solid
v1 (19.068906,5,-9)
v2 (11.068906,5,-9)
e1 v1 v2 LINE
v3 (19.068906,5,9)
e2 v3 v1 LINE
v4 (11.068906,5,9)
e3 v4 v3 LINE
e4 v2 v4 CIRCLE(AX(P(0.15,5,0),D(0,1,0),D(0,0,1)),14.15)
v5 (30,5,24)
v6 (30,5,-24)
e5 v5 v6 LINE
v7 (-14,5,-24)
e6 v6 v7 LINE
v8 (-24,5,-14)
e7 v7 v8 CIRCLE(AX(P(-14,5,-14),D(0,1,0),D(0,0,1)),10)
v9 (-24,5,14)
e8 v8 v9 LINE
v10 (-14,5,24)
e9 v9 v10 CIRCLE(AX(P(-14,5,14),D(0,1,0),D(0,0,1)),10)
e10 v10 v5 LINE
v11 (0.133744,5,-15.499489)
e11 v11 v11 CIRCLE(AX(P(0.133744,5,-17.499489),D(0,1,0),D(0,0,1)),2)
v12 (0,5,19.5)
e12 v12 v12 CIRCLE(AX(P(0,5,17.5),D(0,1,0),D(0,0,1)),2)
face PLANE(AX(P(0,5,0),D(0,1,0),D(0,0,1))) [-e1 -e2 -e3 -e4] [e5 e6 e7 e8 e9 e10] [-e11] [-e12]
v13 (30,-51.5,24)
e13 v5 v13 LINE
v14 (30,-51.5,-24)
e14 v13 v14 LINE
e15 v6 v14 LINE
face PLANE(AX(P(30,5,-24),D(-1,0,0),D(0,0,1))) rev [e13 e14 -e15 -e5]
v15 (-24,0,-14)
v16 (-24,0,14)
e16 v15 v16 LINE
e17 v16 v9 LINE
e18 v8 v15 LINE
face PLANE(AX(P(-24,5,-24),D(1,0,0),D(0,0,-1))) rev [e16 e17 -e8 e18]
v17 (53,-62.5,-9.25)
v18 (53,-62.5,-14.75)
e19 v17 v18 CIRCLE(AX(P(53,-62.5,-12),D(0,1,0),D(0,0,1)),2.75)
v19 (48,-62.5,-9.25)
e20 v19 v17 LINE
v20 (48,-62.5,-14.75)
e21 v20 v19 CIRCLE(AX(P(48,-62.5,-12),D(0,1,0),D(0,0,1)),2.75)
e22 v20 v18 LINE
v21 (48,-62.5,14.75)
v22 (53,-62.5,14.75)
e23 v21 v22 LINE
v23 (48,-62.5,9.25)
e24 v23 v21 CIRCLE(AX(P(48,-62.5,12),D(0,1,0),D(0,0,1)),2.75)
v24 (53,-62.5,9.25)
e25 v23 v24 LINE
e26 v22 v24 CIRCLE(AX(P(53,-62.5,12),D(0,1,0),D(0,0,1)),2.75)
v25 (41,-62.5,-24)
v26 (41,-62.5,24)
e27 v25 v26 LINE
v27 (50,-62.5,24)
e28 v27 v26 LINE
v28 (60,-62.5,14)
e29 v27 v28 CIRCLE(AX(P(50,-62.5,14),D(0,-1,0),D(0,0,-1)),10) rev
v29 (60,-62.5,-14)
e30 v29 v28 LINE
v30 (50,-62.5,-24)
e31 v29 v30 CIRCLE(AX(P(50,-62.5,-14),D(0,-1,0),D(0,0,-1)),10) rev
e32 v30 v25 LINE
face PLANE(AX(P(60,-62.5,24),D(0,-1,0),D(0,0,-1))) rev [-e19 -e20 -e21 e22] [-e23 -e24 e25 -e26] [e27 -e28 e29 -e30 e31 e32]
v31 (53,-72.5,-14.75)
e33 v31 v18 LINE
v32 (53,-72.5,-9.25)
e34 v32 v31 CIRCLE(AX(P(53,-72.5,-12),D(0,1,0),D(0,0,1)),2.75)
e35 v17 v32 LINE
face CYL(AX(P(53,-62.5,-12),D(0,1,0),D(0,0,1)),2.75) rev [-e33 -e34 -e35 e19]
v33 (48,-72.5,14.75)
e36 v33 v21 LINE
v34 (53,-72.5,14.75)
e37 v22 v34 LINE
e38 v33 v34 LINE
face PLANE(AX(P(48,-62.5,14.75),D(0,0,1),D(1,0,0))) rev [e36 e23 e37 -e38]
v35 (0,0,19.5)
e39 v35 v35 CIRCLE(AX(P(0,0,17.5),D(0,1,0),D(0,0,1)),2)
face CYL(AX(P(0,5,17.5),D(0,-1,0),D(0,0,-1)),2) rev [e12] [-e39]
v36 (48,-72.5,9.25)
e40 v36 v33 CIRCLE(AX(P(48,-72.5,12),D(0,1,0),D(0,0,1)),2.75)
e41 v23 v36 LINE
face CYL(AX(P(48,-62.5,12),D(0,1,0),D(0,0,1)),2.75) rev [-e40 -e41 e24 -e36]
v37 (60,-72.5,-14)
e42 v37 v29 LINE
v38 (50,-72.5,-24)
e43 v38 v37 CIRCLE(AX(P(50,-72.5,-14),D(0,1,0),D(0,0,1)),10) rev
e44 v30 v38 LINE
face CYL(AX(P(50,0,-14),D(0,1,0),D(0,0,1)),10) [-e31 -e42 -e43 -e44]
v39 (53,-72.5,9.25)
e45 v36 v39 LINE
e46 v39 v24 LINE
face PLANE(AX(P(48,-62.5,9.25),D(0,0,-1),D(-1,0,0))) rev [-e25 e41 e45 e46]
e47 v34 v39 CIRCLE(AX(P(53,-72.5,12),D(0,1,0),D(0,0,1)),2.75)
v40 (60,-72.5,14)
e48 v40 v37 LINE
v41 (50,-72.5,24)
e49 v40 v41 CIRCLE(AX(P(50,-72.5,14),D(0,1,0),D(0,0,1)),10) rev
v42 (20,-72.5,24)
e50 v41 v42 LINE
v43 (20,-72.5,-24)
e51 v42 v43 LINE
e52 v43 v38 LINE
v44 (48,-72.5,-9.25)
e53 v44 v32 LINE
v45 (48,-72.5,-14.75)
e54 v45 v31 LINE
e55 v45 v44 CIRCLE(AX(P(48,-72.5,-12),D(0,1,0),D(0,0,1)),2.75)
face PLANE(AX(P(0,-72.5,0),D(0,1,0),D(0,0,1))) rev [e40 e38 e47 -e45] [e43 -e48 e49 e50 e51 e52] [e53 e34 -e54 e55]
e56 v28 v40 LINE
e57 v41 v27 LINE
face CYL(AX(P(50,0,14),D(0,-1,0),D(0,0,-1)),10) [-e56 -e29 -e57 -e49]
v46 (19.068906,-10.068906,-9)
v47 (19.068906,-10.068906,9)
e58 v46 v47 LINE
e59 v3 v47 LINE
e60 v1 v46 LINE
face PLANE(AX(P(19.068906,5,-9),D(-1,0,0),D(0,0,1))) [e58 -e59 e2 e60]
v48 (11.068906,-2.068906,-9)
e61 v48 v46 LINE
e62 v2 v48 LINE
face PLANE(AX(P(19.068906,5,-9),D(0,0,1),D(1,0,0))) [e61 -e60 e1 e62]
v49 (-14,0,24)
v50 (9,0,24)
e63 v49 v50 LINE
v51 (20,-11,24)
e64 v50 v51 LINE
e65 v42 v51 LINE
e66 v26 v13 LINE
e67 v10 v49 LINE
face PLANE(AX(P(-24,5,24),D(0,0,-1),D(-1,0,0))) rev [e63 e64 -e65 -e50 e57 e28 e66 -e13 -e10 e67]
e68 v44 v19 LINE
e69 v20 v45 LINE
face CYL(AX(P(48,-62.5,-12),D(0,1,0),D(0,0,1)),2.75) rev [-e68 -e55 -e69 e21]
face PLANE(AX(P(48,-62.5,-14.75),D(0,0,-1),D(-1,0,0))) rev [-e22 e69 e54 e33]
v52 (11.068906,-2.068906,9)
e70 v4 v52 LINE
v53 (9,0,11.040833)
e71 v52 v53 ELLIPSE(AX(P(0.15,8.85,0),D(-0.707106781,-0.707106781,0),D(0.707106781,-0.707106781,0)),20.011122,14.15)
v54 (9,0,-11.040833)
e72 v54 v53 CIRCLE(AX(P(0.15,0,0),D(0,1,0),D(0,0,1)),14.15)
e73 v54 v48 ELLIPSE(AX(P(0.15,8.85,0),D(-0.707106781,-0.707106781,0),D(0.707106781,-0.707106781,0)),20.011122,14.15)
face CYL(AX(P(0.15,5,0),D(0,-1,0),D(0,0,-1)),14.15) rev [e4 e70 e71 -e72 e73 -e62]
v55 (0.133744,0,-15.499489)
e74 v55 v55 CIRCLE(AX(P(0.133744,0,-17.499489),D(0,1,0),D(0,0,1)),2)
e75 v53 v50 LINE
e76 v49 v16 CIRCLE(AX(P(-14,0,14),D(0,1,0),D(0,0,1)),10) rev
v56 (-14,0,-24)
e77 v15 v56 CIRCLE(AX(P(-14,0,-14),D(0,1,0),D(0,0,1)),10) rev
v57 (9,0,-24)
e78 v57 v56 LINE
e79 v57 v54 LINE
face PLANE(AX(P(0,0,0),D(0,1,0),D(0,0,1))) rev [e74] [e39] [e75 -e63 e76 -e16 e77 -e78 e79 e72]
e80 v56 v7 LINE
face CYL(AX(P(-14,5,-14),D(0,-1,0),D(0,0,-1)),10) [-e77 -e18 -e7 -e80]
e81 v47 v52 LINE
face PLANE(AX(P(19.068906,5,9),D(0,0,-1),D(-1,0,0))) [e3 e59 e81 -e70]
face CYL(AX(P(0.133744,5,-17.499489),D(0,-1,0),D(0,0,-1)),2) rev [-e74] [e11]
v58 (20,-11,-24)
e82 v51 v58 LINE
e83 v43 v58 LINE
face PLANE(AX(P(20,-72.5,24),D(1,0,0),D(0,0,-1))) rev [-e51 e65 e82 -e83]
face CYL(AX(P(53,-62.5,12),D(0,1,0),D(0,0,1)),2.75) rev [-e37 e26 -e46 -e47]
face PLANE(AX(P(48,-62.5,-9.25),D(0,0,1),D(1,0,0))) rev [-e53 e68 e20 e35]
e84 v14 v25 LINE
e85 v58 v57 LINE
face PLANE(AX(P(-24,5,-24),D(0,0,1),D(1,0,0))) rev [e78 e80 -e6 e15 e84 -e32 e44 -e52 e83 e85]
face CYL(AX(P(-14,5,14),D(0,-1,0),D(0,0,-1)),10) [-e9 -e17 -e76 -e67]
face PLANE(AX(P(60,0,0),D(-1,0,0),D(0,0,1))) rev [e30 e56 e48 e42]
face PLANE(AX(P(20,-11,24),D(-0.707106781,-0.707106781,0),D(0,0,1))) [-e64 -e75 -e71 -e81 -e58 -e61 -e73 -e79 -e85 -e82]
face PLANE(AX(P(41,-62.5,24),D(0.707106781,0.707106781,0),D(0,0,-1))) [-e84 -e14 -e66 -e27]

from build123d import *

# Parameters (mm, degrees)
SKETCH1_W                 = 54
SKETCH1_H                 = 48
SKETCH1_R                 = 2
BOSS_EXTRUDE1_DEPTH       = 5
SKETCH2_W                 = 10
SKETCH2_H                 = 48
BOSS_EXTRUDE2_DEPTH       = 72.5
SKETCH3_W                 = 48
SKETCH3_H                 = 10
BOSS_EXTRUDE3_DEPTH       = 30
FILLET1_R                 = 10
CHAMFER1_SIZE             = 11
F_1_0MM_START             = -72.5
F_1_0MM_DOWEL_SLOT1_DEPTH = 10
FILLET2_R                 = 10


# Read off the part's stored shape, not the designer's step: Ø1.0mm Dowel Slot1
with BuildPart() as part:
    # Sketch1 → Boss-Extrude1 (new body)
    with BuildSketch(Plane(origin=(0, 0, 0), x_dir=(1, 0, 0), z_dir=(0, 1, 0))):
        with Locations((3, 0)):
            Rectangle(SKETCH1_W, SKETCH1_H)
        with Locations(Location((0.133743503, 17.499488926, 0), (0, 0, 270))):
            Circle(SKETCH1_R, mode=Mode.SUBTRACT)
        with Locations(Location((0, -17.5, 0), (0, 0, 270))):
            Circle(SKETCH1_R, mode=Mode.SUBTRACT)
        with BuildLine():
            Line((19.068905623, 9), (11.068905623, 9))
            ThreePointArc((11.068905623, 9), (-14, 0), (11.068905623, -9))
            Line((11.068905623, -9), (19.068905623, -9))
            Line((19.068905623, -9), (19.068905623, 9))
        make_face(mode=Mode.SUBTRACT)
    extrude(amount=BOSS_EXTRUDE1_DEPTH)

    # Sketch2 → Boss-Extrude2 (add)
    with BuildSketch(Plane.XZ):
        with Locations((25, 0)):
            Rectangle(SKETCH2_W, SKETCH2_H)
    extrude(amount=BOSS_EXTRUDE2_DEPTH)

    # Sketch3 → Boss-Extrude3 (add)
    with BuildSketch(Plane(origin=(30, 0, 0), x_dir=(0, 0, -1), z_dir=(1, 0, 0))):
        with Locations((0, -67.5)):
            Rectangle(SKETCH3_W, SKETCH3_H)
    extrude(amount=BOSS_EXTRUDE3_DEPTH)

    # Fillet1
    fillet1_edges = [part.edges().sort_by_distance(p)[0] for p in [
        (-24, 2.5, -24),
        (-24, 2.5, 24),
    ]]
    fillet(fillet1_edges, radius=FILLET1_R)

    # Chamfer1
    # the kernel refuses this chamfer: 11 mm, written as the material it adds along each edge
    with BuildSketch(Plane(origin=(20, 0, 24), x_dir=(-0.9996219169112968, 0.027495876610586372, 0), z_dir=(0, 0, -1))) as chamfer1_piece_1_section:
        Polygon((CHAMFER1_SIZE * 0.999621916911, -CHAMFER1_SIZE * 0.0274958766106), (-CHAMFER1_SIZE * 0.0274958766106, -CHAMFER1_SIZE * 0.999621916911), (0, 0), align=None)
    chamfer1_piece_1 = extrude(amount=48, mode=Mode.PRIVATE)
    chamfer1_piece_1 = split(chamfer1_piece_1, bisect_by=Plane(origin=(15.585058089, -3.181005548, 9), z_dir=(0, 0, 1)), keep=Keep.TOP, mode=Mode.PRIVATE)
    chamfer1_piece_1 = chamfer1_piece_1 - Plane(origin=(0.15, -3.181005548, 0), x_dir=(0.7716541076196256, 0, -0.6360424028268551), z_dir=(0, -1, 0)) * Cylinder(14.15, 140, mode=Mode.PRIVATE)
    chamfer1_piece_1 = split(chamfer1_piece_1, bisect_by=Plane(origin=(19.068905623, -3.181005548, 16.524598141), z_dir=(-1, 0, 0)), keep=Keep.TOP, mode=Mode.PRIVATE)
    add(chamfer1_piece_1)
    with BuildSketch(Plane(origin=(20, 0, 24), x_dir=(-0.9996219169112968, 0.027495876610586372, 0), z_dir=(0, 0, -1))) as chamfer1_piece_2_section:
        Polygon((CHAMFER1_SIZE * 0.999621916911, -CHAMFER1_SIZE * 0.0274958766106), (-CHAMFER1_SIZE * 0.0274958766106, -CHAMFER1_SIZE * 0.999621916911), (0, 0), align=None)
    chamfer1_piece_2 = extrude(amount=48, mode=Mode.PRIVATE)
    chamfer1_piece_2 = split(chamfer1_piece_2, bisect_by=Plane(origin=(19.684713813, -5.503387728, 9), z_dir=(0, 0, 1)), keep=Keep.TOP, mode=Mode.PRIVATE)
    chamfer1_piece_2 = split(chamfer1_piece_2, bisect_by=Plane(origin=(19.068905623, -5.503387728, 16.5), z_dir=(1, 0, 0)), keep=Keep.TOP, mode=Mode.PRIVATE)
    add(chamfer1_piece_2)
    with BuildSketch(Plane(origin=(20, 0, 24), x_dir=(-0.9996219169112968, 0.027495876610586372, 0), z_dir=(0, 0, -1))) as chamfer1_piece_3_section:
        Polygon((CHAMFER1_SIZE * 0.999621916911, -CHAMFER1_SIZE * 0.0274958766106), (-CHAMFER1_SIZE * 0.0274958766106, -CHAMFER1_SIZE * 0.999621916911), (0, 0), align=None)
    chamfer1_piece_3 = extrude(amount=48, mode=Mode.PRIVATE)
    chamfer1_piece_3 = split(chamfer1_piece_3, bisect_by=Plane(origin=(19.684713813, -5.503387728, 9), z_dir=(0, 0, -1)), keep=Keep.TOP, mode=Mode.PRIVATE)
    chamfer1_piece_3 = split(chamfer1_piece_3, bisect_by=Plane(origin=(19.068905623, -5.503387728, 0), z_dir=(1, 0, 0)), keep=Keep.TOP, mode=Mode.PRIVATE)
    chamfer1_piece_3 = split(chamfer1_piece_3, bisect_by=Plane(origin=(19.684713813, -5.503387728, -9), z_dir=(0, 0, 1)), keep=Keep.TOP, mode=Mode.PRIVATE)
    add(chamfer1_piece_3)
    with BuildSketch(Plane(origin=(20, 0, 24), x_dir=(-0.9996219169112968, 0.027495876610586372, 0), z_dir=(0, 0, -1))) as chamfer1_piece_4_section:
        Polygon((CHAMFER1_SIZE * 0.999621916911, -CHAMFER1_SIZE * 0.0274958766106), (-CHAMFER1_SIZE * 0.0274958766106, -CHAMFER1_SIZE * 0.999621916911), (0, 0), align=None)
    chamfer1_piece_4 = extrude(amount=48, mode=Mode.PRIVATE)
    chamfer1_piece_4 = chamfer1_piece_4 - Plane(origin=(0.15, -3.181005547, 0), x_dir=(0.7716541076196256, 0, -0.6360424028268551), z_dir=(0, -1, 0)) * Cylinder(14.15, 140, mode=Mode.PRIVATE)
    chamfer1_piece_4 = split(chamfer1_piece_4, bisect_by=Plane(origin=(19.068905623, -3.181005547, -16.524598139), z_dir=(-1, 0, 0)), keep=Keep.TOP, mode=Mode.PRIVATE)
    chamfer1_piece_4 = split(chamfer1_piece_4, bisect_by=Plane(origin=(15.585058087, -3.181005547, -9), z_dir=(0, 0, -1)), keep=Keep.TOP, mode=Mode.PRIVATE)
    add(chamfer1_piece_4)
    with BuildSketch(Plane(origin=(20, 0, 24), x_dir=(-0.9996219169112968, 0.027495876610586372, 0), z_dir=(0, 0, -1))) as chamfer1_piece_5_section:
        Polygon((CHAMFER1_SIZE * 0.999621916911, -CHAMFER1_SIZE * 0.0274958766106), (-CHAMFER1_SIZE * 0.0274958766106, -CHAMFER1_SIZE * 0.999621916911), (0, 0), align=None)
    chamfer1_piece_5 = extrude(amount=48, mode=Mode.PRIVATE)
    chamfer1_piece_5 = split(chamfer1_piece_5, bisect_by=Plane(origin=(19.068905623, -5.503387728, -16.5), z_dir=(1, 0, 0)), keep=Keep.TOP, mode=Mode.PRIVATE)
    chamfer1_piece_5 = split(chamfer1_piece_5, bisect_by=Plane(origin=(19.684713813, -5.503387728, -9), z_dir=(0, 0, -1)), keep=Keep.TOP, mode=Mode.PRIVATE)
    add(chamfer1_piece_5)
    with BuildSketch(Plane(origin=(30, -62.5, -24), x_dir=(-0.02749587661058594, 0.9996219169112968, 0), z_dir=(0, 0, 1))) as chamfer1_piece_6:
        Polygon((CHAMFER1_SIZE * 0.999621916911, -CHAMFER1_SIZE * 0.0274958766106), (-CHAMFER1_SIZE * 0.0274958766106, -CHAMFER1_SIZE * 0.999621916911), (0, 0), align=None)
    extrude(amount=48)

    # Ø1.0mm Dowel Slot1 outline → Ø1.0mm Dowel Slot1 (cut)
    with BuildSketch(Plane(origin=(0, 0, 0), x_dir=(1, 0, 0), z_dir=(0, 1, 0)).offset(F_1_0MM_START)):
        with BuildLine():
            Line((48, 9.25), (53, 9.25))
            ThreePointArc((53, 9.25), (55.75, 12), (53, 14.75))
            Line((53, 14.75), (48, 14.75))
            ThreePointArc((48, 14.75), (45.25, 12), (48, 9.25))
        make_face()
        with BuildLine():
            Line((48, -14.75), (53, -14.75))
            ThreePointArc((53, -14.75), (55.75, -12), (53, -9.25))
            Line((53, -9.25), (48, -9.25))
            ThreePointArc((48, -9.25), (45.25, -12), (48, -14.75))
        make_face()
    extrude(amount=F_1_0MM_DOWEL_SLOT1_DEPTH, mode=Mode.SUBTRACT)

    # Fillet2
    fillet2_edges = [part.edges().sort_by_distance(p)[0] for p in [
        (60, -67.5, 24),
        (60, -67.5, -24),
    ]]
    fillet(fillet2_edges, radius=FILLET2_R)


solid = part.part
